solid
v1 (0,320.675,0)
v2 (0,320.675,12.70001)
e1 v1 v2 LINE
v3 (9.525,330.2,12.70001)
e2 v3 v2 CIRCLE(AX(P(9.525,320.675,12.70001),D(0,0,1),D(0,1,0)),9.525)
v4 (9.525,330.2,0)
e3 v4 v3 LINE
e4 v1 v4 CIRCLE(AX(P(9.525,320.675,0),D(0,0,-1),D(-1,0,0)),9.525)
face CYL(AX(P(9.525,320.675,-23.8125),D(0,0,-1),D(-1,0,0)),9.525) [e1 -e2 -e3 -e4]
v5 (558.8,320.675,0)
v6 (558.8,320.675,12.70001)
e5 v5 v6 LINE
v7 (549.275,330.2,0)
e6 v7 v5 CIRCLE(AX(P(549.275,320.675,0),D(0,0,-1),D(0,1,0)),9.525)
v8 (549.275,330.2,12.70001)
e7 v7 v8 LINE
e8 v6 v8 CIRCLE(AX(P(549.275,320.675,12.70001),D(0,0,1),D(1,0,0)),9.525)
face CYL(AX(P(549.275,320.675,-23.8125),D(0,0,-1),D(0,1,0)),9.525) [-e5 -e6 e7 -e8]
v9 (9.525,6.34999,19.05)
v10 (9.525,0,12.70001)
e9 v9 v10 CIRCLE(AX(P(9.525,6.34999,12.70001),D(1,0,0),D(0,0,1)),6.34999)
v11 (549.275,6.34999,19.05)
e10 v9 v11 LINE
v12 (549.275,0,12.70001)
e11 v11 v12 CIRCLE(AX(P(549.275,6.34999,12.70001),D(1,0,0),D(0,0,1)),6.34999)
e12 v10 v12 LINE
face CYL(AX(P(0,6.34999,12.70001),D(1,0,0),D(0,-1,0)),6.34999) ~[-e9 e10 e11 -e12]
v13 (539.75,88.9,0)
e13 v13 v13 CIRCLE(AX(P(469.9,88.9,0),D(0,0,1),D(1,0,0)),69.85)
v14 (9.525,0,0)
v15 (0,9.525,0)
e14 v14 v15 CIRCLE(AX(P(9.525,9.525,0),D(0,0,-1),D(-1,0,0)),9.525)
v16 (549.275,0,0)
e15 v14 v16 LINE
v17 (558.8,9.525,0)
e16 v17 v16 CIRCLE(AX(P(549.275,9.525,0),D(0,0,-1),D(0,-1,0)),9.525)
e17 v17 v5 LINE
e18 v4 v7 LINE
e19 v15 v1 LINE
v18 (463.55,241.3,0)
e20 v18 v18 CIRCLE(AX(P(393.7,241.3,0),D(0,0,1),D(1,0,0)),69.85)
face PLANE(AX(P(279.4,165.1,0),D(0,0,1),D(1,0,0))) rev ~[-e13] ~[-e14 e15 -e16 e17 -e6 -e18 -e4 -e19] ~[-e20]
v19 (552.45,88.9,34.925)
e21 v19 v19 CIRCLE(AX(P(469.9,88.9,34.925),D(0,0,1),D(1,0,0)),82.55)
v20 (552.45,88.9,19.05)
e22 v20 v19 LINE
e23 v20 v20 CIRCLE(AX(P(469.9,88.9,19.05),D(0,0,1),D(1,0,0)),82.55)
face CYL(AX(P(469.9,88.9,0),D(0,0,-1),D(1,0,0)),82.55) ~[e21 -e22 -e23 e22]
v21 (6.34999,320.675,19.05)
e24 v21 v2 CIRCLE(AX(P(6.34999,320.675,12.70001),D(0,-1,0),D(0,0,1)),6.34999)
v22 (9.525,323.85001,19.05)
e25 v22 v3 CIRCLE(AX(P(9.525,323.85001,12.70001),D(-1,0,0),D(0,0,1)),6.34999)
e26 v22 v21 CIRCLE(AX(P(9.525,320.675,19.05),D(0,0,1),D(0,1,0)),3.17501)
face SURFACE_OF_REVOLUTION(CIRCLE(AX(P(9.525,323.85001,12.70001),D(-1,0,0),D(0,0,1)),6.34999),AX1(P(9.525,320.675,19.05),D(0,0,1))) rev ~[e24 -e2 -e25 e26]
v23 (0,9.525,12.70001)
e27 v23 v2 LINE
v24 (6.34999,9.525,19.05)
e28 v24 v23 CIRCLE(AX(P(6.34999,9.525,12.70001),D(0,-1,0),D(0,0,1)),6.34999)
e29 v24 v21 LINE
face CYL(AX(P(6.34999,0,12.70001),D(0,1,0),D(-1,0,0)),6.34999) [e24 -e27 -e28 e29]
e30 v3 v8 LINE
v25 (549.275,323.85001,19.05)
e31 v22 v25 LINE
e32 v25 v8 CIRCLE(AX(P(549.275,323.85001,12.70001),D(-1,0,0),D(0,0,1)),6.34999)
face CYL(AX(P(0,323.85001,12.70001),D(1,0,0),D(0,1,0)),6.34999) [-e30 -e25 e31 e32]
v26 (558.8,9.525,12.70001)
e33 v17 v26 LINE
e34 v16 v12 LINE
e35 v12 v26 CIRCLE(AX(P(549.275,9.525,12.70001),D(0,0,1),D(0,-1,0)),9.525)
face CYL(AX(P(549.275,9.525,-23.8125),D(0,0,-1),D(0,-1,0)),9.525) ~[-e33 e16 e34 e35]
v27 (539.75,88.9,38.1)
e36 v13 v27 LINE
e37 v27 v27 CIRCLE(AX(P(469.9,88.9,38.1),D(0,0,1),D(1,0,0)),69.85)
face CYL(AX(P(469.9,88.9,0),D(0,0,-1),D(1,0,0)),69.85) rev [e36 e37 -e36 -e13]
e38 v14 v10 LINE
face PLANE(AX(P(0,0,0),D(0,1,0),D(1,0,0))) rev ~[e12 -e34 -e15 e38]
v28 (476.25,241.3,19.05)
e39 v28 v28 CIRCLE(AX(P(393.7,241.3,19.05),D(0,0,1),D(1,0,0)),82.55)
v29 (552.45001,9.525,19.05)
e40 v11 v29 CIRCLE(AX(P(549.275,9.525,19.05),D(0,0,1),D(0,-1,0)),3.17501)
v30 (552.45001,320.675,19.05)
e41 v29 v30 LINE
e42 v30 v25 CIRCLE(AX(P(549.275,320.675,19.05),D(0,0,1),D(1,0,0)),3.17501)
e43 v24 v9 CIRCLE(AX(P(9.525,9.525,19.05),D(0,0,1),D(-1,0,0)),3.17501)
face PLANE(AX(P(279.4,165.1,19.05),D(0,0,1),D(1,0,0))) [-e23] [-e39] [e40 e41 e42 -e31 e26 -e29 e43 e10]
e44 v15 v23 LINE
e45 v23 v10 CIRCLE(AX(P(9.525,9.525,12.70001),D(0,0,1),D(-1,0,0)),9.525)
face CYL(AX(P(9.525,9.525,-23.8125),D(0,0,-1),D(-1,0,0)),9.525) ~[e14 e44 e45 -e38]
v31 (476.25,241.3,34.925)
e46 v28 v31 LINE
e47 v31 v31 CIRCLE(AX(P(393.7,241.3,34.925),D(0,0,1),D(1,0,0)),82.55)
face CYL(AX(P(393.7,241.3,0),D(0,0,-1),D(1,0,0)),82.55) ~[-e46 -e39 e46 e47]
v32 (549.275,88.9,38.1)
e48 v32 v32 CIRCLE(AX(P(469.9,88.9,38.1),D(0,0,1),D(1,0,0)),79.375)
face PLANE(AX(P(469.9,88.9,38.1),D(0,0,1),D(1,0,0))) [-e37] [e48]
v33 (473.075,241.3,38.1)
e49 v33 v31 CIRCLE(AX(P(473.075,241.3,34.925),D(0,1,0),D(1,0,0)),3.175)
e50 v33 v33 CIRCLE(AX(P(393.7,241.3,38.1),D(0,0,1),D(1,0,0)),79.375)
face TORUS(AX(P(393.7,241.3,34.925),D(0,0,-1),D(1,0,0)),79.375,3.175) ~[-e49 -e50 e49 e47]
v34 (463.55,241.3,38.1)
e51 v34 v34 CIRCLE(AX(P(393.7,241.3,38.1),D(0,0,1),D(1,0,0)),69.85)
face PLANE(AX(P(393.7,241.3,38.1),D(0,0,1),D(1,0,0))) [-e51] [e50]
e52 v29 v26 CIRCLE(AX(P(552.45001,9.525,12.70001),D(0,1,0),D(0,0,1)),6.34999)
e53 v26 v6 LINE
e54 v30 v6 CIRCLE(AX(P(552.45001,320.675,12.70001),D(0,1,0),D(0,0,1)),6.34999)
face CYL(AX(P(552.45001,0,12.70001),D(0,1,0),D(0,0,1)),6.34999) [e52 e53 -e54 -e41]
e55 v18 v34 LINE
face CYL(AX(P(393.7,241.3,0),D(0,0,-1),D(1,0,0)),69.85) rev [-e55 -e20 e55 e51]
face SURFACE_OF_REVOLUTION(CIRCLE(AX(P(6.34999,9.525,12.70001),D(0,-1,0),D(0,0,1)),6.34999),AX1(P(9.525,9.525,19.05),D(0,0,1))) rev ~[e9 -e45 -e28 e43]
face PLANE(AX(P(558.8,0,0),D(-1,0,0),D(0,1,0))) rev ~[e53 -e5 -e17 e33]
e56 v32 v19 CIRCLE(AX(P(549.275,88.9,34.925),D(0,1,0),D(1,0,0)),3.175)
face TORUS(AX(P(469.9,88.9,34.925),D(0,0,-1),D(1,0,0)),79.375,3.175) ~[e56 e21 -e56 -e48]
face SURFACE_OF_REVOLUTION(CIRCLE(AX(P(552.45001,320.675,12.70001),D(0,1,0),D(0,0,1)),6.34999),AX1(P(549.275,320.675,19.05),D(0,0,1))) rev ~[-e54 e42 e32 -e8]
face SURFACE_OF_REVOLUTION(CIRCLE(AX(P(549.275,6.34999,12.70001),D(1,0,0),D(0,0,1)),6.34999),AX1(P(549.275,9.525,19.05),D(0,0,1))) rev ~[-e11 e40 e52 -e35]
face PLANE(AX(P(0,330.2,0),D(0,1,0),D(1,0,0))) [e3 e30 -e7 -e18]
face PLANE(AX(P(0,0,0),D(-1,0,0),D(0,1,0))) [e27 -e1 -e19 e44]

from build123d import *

# Parameters (mm, degrees)
F0_R         = 82.55
F0_R_2       = 69.85
F1_DEPTH     = 38.1
F0_W         = 558.8
F0_H         = 330.2
F2_DEPTH     = 19.05
F3_R         = 6.34999
F4_T1_DEPTH  = 42.8625
F4_T4_ANGLE  = 90
F4_T6_ANGLE  = 90
F4_T8_ANGLE  = 90
F4_T10_ANGLE = 90
F5_R         = 3.175


# Not quite as in the source:
# - a fillet or chamfer that OpenCascade refuses, or shapes differently, is made with other operations: its cross-section is extruded or revolved along the edge and cut away or added
# - a fillet or chamfer is up to 0.001 mm smaller than in the source, because OpenCascade refuses the exact size


with BuildPart() as f1:
    # F0 (on Top) → F1 (new body)
    with BuildSketch(Plane.XY):
        with Locations((393.7, 241.3)):
            Circle(F0_R)
        with Locations((393.7, 241.3)):
            Circle(F0_R_2, mode=Mode.SUBTRACT)
    extrude(amount=F1_DEPTH)



with BuildPart() as f1b:
    # F0 (on Top) → F1, piece 2 (new body)
    with BuildSketch(Plane.XY):
        with Locations((469.9, 88.9)):
            Circle(F0_R)
        with Locations((469.9, 88.9)):
            Circle(F0_R_2, mode=Mode.SUBTRACT)
    extrude(amount=F1_DEPTH)


with BuildPart() as f1_1:
    add(f1.part)

    add(f1b.part)  # F2 merges F1b
    # F0 (on Top) → F2 (join)
    with BuildSketch(Plane.XY):
        with Locations((279.4, 165.1)):
            Rectangle(F0_W, F0_H)
        with Locations((469.9, 88.9)):
            Circle(F0_R, mode=Mode.SUBTRACT)
        with Locations((393.7, 241.3)):
            Circle(F0_R, mode=Mode.SUBTRACT)
    extrude(amount=F2_DEPTH)

    # F3 (radius 6.35 in the source; OpenCascade refuses exactly that, so slightly less here)
    f3_edges = [f1_1.edges().sort_by_distance(p)[0] for p in [
        (0, 165.1, 19.05),
        (279.4, 330.2, 19.05),
        (279.4, 0, 19.05),
        (558.8, 165.1, 19.05),
    ]]
    fillet(f3_edges, radius=F3_R)

    # F4: fillet of radius 9.525 on 4 edges, made by hand

    # F4_s2 → F4_t1 (cut)
    with BuildSketch(Plane.XY.offset(-23.8125)):
        with BuildLine():
            ThreePointArc((0, 9.525), (2.7898079092, 2.7898079092), (9.525, 0))
            Line((9.525, 0), (0, 0))
            Line((0, 0), (0, 9.525))
        make_face()
        with BuildLine():
            ThreePointArc((549.275, 0), (556.0101920908, 2.7898079092), (558.8, 9.525))
            Line((558.8, 9.525), (558.8, 0))
            Line((558.8, 0), (549.275, 0))
        make_face()
        with BuildLine():
            ThreePointArc((549.275, 330.2), (556.0101920908, 327.4101920908), (558.8, 320.675))
            Line((558.8, 320.675), (558.8, 330.2))
            Line((558.8, 330.2), (549.275, 330.2))
        make_face()
        with BuildLine():
            ThreePointArc((0, 320.675), (2.7898079092, 327.4101920908), (9.525, 330.2))
            Line((9.525, 330.2), (0, 330.2))
            Line((0, 330.2), (0, 320.675))
        make_face()
    extrude(amount=F4_T1_DEPTH, mode=Mode.SUBTRACT)

    # F4_s3 → F4_t4 (revolve, cut)
    with BuildSketch(Plane.YZ.offset(9.525)):
        with BuildLine():
            ThreePointArc((323.85001, 19.05), (328.3401309895, 17.1901309895), (330.2, 12.70001))
            Line((330.2, 12.70001), (330.2, 19.05))
            Line((330.2, 19.05), (323.85001, 19.05))
        make_face()
    revolve(axis=Axis((9.525, 320.675, 19.05), (0, 0, 1)), revolution_arc=F4_T4_ANGLE, mode=Mode.SUBTRACT)

    # F4_s5 → F4_t6 (revolve, cut)
    with BuildSketch(Plane.XZ.offset(-320.675)):
        with BuildLine():
            ThreePointArc((552.45001, 19.05), (556.9401309895, 17.1901309895), (558.8, 12.70001))
            Line((558.8, 12.70001), (558.8, 19.05))
            Line((558.8, 19.05), (552.45001, 19.05))
        make_face()
    revolve(axis=Axis((549.275, 320.675, 19.05), (0, 0, 1)), revolution_arc=F4_T6_ANGLE, mode=Mode.SUBTRACT)

    # F4_s7 → F4_t8 (revolve, cut)
    with BuildSketch(Plane.YZ.offset(549.275)):
        with BuildLine():
            ThreePointArc((6.34999, 19.05), (1.8598690105, 17.1901309895), (0, 12.70001))
            Line((0, 12.70001), (0, 19.05))
            Line((0, 19.05), (6.34999, 19.05))
        make_face()
    revolve(axis=Axis((549.275, 9.525, 19.05), (0, 0, 1)), revolution_arc=F4_T8_ANGLE, mode=Mode.SUBTRACT)

    # F4_s9 → F4_t10 (revolve, cut)
    with BuildSketch(Plane.XZ.offset(-9.525)):
        with BuildLine():
            ThreePointArc((6.34999, 19.05), (1.8598690105, 17.1901309895), (0, 12.70001))
            Line((0, 12.70001), (0, 19.05))
            Line((0, 19.05), (6.34999, 19.05))
        make_face()
    revolve(axis=Axis((9.525, 9.525, 19.05), (0, 0, 1)), revolution_arc=F4_T10_ANGLE, mode=Mode.SUBTRACT)

    # F5
    f5_edges = [f1_1.edges().sort_by_distance(p)[0] for p in [
        (387.35, 88.9, 38.1),
        (311.15, 241.3, 38.1),
    ]]
    fillet(f5_edges, radius=F5_R)


solid = f1_1.part
